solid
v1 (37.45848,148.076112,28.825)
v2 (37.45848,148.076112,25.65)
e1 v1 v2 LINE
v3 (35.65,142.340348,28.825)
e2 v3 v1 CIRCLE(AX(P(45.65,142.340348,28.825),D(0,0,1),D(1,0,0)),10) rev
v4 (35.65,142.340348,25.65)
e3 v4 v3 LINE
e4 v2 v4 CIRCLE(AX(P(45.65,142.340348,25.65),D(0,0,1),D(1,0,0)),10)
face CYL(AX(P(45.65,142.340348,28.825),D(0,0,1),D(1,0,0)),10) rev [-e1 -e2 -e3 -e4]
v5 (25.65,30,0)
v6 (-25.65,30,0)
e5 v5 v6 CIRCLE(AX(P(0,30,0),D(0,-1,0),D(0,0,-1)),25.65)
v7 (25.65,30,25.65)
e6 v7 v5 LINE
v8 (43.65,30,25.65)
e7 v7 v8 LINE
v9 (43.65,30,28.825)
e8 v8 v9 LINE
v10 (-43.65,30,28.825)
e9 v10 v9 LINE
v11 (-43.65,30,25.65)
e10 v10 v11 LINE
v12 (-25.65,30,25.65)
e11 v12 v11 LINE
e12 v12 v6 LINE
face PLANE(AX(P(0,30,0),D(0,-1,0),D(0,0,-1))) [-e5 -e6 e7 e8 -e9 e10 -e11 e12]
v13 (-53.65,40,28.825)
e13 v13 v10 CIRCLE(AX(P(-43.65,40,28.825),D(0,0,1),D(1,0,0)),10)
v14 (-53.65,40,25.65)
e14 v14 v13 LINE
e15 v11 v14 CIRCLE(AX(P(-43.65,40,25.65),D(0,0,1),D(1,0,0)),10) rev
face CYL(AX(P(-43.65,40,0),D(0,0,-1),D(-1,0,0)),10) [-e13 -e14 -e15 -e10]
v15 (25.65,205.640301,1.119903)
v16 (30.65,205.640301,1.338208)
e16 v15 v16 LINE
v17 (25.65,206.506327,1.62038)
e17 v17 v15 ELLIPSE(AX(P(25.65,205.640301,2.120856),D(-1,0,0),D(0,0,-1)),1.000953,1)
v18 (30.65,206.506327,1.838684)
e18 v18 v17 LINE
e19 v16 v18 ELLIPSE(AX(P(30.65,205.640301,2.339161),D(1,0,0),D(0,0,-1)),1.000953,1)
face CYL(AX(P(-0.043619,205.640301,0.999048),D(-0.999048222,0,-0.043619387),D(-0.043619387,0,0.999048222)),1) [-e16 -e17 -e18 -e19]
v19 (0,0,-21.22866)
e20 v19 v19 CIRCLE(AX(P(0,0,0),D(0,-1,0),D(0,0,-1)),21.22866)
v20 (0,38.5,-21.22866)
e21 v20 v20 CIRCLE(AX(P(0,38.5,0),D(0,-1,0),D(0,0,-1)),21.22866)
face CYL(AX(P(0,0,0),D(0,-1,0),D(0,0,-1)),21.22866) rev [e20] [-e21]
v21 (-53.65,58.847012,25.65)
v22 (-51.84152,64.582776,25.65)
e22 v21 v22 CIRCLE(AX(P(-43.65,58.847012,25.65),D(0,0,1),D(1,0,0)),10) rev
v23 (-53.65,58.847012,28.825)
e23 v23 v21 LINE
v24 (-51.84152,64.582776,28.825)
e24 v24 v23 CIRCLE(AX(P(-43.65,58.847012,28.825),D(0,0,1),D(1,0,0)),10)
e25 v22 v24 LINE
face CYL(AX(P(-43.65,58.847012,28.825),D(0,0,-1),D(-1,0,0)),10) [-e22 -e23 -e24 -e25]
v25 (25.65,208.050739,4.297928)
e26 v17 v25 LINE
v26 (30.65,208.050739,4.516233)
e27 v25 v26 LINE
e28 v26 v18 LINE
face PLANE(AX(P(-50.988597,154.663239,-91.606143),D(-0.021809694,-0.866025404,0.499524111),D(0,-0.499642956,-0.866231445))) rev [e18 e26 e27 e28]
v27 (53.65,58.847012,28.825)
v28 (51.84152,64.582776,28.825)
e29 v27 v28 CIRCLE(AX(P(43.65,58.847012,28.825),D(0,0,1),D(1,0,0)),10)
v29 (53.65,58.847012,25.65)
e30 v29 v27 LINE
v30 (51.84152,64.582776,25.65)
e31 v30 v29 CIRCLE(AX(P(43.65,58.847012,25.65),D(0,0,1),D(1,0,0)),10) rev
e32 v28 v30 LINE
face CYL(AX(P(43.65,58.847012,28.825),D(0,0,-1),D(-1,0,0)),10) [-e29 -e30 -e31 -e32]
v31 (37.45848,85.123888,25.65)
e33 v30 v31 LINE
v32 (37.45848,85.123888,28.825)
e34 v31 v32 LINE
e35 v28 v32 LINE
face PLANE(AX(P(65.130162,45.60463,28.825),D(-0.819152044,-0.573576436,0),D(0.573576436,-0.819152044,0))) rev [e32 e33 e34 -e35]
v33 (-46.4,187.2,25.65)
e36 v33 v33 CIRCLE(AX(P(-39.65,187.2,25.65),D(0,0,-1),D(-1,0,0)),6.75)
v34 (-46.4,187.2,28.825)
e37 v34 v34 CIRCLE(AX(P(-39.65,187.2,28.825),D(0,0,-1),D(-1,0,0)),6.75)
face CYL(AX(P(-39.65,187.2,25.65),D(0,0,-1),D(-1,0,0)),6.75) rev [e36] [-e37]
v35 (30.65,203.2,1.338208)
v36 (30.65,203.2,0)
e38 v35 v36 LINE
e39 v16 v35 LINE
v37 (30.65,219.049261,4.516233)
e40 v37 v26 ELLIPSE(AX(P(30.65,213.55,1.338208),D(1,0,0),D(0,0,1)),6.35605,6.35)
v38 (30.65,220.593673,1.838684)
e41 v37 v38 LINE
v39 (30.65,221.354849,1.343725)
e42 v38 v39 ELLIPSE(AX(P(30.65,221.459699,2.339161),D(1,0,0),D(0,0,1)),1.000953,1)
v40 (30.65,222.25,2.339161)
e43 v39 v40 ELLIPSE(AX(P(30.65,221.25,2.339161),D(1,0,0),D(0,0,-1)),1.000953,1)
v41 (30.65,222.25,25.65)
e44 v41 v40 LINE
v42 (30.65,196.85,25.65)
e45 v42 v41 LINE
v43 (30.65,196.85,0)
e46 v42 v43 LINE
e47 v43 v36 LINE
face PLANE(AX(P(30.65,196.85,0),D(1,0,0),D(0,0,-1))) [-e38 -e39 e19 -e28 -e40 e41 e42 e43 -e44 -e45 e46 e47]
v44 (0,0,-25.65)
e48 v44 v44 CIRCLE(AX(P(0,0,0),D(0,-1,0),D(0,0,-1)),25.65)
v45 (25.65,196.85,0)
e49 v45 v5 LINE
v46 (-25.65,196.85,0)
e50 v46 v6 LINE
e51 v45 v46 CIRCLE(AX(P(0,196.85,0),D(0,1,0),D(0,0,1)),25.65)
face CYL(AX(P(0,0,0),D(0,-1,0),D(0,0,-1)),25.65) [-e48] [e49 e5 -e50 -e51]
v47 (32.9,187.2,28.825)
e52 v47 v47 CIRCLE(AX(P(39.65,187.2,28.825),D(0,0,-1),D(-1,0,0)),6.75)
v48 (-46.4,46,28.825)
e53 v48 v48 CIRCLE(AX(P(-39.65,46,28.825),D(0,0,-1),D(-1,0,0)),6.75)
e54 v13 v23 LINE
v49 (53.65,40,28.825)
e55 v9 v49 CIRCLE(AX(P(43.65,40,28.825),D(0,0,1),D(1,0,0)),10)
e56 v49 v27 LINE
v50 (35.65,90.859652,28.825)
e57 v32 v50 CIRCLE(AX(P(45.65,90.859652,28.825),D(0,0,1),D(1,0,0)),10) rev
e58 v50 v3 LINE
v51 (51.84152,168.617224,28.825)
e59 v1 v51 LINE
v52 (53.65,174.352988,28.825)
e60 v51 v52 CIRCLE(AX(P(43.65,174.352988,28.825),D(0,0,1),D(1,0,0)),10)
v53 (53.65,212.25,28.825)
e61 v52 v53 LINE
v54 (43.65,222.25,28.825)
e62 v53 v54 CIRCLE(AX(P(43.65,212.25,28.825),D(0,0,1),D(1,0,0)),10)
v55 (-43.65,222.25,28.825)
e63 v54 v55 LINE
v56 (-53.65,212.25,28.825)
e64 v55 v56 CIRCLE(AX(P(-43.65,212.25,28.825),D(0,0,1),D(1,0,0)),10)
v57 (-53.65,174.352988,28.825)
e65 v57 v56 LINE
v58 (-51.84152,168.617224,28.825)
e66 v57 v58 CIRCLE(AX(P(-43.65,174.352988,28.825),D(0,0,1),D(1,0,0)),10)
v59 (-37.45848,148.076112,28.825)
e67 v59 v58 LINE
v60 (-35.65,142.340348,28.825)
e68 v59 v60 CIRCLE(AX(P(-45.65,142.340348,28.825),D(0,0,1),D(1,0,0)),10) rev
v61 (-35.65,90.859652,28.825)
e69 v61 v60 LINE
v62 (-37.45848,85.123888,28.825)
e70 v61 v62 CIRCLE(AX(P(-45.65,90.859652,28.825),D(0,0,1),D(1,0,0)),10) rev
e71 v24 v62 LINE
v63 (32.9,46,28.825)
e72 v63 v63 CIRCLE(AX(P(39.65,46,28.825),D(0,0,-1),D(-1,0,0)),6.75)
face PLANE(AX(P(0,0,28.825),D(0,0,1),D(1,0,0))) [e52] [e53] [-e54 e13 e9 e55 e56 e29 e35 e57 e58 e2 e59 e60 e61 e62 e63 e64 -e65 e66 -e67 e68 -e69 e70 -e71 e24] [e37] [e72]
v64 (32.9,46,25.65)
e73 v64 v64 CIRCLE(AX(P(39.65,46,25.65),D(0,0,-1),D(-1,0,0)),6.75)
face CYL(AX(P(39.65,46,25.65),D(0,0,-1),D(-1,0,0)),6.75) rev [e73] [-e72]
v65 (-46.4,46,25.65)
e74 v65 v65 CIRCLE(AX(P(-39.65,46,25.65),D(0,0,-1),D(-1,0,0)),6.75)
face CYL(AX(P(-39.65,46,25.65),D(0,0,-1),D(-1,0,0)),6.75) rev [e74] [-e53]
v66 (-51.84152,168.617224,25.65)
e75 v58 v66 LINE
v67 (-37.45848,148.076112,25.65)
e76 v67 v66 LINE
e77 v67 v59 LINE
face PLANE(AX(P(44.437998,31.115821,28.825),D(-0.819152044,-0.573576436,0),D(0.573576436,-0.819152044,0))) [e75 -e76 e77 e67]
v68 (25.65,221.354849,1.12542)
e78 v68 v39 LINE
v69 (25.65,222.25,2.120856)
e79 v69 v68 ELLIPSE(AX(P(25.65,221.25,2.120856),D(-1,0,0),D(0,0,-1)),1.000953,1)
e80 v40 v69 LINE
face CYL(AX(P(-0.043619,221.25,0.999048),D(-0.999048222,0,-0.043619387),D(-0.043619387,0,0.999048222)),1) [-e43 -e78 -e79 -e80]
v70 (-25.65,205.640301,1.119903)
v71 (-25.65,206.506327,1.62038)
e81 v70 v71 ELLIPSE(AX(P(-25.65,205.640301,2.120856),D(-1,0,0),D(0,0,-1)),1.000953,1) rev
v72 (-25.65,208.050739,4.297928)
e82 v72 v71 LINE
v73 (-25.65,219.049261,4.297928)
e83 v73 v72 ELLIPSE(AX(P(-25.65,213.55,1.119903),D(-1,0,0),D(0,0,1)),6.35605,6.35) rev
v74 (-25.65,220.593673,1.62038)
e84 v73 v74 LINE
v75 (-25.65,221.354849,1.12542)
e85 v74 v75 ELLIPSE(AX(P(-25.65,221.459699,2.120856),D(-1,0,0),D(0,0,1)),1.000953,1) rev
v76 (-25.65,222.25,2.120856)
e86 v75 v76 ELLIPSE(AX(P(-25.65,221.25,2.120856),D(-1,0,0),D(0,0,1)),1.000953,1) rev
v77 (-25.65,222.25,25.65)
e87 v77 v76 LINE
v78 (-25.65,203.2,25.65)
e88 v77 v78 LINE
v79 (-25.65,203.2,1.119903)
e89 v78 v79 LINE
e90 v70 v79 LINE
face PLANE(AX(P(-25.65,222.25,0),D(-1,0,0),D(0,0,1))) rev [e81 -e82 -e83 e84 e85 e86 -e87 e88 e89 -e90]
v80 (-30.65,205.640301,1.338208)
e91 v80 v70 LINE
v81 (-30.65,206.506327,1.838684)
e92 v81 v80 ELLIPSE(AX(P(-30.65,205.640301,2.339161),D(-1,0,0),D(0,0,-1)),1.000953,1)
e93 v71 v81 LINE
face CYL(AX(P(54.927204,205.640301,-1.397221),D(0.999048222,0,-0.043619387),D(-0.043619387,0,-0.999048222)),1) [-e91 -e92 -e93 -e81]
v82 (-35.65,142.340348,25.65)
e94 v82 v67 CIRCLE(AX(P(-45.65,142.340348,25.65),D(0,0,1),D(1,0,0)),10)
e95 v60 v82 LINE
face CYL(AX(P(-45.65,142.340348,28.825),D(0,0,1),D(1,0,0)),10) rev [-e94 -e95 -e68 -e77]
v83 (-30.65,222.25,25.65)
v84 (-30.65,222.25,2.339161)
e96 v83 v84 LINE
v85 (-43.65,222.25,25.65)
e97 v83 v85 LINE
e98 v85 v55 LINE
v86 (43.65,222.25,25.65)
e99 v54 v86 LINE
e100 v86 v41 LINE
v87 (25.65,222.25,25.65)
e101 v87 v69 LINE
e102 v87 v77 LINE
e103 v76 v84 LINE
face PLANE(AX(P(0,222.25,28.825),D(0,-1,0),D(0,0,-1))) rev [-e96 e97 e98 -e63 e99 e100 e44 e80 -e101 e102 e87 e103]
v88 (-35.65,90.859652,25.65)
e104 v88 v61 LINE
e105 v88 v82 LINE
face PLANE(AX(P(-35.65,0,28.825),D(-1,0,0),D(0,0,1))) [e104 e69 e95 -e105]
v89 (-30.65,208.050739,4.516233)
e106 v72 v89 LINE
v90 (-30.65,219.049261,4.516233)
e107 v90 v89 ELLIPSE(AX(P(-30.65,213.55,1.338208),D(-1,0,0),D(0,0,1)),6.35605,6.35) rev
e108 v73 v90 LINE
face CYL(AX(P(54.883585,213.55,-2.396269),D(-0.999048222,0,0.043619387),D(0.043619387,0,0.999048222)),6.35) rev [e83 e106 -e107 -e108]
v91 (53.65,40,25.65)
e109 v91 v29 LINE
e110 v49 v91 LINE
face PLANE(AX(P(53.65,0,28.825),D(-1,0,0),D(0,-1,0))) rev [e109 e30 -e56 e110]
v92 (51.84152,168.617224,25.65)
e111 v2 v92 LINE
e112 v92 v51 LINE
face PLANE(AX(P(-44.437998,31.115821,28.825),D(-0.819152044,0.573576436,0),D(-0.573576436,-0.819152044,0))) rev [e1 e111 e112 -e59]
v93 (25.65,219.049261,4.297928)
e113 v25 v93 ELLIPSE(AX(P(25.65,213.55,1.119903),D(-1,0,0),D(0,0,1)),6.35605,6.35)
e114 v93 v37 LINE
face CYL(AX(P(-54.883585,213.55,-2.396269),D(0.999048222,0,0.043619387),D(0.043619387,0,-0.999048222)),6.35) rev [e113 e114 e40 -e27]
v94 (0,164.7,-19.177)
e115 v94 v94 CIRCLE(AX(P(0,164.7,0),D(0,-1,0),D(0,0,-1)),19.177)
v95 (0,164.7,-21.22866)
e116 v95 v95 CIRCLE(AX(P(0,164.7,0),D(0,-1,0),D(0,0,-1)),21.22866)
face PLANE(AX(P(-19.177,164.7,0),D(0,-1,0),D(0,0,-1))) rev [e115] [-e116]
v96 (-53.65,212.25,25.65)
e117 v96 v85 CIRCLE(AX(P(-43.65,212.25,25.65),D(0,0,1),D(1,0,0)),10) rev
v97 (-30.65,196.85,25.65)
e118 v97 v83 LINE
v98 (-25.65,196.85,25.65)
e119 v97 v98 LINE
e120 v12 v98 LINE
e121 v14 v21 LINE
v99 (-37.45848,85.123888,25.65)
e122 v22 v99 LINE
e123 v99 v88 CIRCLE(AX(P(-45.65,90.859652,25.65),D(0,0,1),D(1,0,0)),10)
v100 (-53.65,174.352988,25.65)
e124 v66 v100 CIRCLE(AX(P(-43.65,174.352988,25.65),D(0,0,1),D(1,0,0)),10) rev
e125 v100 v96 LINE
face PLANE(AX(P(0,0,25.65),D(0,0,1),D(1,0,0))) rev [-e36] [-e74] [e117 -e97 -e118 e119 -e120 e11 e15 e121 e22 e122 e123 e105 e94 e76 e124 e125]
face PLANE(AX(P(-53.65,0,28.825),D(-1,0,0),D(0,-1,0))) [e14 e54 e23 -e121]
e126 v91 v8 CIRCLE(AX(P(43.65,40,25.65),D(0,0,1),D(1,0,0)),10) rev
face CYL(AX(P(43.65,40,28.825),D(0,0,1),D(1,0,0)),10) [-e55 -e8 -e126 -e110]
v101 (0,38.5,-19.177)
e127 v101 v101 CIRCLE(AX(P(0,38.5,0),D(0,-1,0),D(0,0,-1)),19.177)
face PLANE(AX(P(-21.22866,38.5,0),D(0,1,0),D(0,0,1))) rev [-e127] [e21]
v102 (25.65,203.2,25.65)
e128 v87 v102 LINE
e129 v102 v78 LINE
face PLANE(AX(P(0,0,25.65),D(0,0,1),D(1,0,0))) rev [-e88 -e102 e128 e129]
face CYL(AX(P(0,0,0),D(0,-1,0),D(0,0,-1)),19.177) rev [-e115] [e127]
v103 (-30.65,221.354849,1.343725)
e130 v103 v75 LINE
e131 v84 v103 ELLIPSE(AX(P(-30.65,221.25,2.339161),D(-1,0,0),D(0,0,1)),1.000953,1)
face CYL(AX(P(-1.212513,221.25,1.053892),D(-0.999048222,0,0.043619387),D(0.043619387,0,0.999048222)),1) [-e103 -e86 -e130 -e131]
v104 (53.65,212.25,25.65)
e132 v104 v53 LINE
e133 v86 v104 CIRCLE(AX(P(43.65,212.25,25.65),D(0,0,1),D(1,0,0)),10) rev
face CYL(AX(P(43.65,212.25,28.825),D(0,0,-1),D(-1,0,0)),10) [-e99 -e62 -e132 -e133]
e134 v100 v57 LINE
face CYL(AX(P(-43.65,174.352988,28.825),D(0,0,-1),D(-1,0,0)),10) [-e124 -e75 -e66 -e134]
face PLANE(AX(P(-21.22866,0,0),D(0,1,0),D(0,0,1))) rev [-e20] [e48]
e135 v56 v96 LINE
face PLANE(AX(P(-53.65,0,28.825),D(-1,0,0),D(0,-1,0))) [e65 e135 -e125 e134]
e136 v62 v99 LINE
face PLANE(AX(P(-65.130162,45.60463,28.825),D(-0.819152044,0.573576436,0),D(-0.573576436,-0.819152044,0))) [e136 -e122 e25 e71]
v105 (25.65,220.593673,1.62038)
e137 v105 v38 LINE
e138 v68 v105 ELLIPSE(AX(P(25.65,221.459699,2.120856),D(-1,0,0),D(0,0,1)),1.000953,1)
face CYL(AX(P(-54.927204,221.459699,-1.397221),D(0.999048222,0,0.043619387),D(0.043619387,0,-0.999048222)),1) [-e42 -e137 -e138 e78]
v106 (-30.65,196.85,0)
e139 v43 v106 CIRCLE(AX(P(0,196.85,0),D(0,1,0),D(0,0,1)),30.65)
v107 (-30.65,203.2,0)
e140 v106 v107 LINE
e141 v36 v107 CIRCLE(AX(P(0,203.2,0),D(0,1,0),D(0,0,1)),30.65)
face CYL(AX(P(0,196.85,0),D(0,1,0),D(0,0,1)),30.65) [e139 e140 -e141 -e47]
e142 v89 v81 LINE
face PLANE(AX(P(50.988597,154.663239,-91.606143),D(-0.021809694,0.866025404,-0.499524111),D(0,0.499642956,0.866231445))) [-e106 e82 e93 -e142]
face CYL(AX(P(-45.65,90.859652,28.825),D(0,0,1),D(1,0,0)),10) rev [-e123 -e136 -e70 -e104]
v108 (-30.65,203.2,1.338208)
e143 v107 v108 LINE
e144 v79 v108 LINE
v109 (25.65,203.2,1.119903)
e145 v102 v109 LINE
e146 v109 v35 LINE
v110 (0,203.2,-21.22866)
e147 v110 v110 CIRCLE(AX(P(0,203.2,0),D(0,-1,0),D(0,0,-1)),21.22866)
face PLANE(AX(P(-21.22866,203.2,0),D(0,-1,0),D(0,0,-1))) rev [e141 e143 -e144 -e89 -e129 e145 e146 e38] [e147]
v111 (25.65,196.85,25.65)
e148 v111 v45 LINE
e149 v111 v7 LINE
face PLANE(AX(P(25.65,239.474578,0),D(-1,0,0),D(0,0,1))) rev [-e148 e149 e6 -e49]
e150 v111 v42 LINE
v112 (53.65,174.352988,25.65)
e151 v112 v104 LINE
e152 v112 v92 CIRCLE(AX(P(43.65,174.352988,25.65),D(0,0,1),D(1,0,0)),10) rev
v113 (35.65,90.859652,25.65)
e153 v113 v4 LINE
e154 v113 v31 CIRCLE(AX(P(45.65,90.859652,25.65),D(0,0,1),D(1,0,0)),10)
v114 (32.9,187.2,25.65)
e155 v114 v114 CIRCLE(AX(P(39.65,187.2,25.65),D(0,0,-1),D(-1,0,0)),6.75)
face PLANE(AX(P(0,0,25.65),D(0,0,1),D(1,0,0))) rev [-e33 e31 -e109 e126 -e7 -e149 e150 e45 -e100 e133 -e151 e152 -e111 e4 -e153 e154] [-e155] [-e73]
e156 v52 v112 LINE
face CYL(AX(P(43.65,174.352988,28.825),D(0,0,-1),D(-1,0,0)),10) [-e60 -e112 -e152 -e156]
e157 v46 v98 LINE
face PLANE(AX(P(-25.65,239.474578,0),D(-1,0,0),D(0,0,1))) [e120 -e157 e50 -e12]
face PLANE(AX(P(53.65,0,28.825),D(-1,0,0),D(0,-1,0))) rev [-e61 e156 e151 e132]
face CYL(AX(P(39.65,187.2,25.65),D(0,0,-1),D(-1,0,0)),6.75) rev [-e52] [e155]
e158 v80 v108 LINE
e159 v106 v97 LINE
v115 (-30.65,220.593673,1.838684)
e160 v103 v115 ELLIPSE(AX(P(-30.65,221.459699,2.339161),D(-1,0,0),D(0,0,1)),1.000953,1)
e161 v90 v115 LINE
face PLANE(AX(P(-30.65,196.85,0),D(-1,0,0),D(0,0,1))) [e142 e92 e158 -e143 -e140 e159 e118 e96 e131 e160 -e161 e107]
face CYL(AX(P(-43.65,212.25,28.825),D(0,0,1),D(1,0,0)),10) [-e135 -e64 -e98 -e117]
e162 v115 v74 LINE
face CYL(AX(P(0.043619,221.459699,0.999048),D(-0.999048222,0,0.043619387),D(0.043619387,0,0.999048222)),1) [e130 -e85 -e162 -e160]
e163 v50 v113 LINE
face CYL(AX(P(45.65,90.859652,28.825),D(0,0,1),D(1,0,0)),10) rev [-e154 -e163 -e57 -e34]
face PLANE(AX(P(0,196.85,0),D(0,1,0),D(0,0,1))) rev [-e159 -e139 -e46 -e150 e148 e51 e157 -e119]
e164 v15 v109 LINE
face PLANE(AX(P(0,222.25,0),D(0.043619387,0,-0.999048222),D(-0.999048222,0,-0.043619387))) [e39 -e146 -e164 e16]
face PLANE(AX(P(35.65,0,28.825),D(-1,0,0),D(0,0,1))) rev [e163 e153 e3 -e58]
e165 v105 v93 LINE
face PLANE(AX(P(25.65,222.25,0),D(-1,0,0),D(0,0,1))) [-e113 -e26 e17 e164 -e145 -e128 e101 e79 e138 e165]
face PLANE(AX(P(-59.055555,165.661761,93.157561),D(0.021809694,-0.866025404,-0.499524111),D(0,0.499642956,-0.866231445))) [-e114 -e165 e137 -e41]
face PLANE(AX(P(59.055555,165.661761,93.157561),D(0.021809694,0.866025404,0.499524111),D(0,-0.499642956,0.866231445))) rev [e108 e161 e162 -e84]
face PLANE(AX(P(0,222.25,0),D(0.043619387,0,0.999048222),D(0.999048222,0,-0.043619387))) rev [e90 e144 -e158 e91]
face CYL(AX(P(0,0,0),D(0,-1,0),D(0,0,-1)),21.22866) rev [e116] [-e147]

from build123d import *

# Parameters (mm, degrees)
BOSS_EXTRUDE1_START   = -173.2
BOSS_EXTRUDE1_DEPTH   = 173.2
BOSS_EXTRUDE2_DEPTH   = 3.175
M12_CLEARANCE_HOLE1_D = 13.5
FILLET1_R             = 10
FILLET1_OF_MIRROR1_R  = 10
BOSS_EXTRUDE3_DEPTH   = 6.35
BOSS_EXTRUDE4_DEPTH   = 19.05
CUT_EXTRUDE1_DEPTH    = 238.82533849
FILLET2_R             = 1
FILLET2_OF_MIRROR2_R  = 1


with BuildPart() as part:
    # Sketch12 → Revolve1 (revolve)
    with BuildSketch(Plane.XY, mode=Mode.PRIVATE) as revolve1_sk:
        Polygon((-25.65, 0), (-25.65, 203.2), (-21.22866, 203.2), (-21.22866, 164.7), (-19.177, 164.7), (-19.177, 38.5), (-21.22866, 38.5), (-21.22866, 0), align=None)
    revolve(revolve1_sk.sketch.rotate(Axis((0, 0, 0), (0, 1, 0)), 270), axis=Axis((0, 0, 0), (0, 1, 0)))

    # Sketch14 → Boss-Extrude1 (add)
    with BuildSketch(Plane(origin=(0, 30, 0), x_dir=(-1, 0, 0), z_dir=(0, -1, 0)).offset(BOSS_EXTRUDE1_START)):
        with BuildLine():
            Line((-25.65, 0), (-25.65, -25.65))
            Line((-25.65, -25.65), (1.5e-08, -25.65))
            ThreePointArc((1.5e-08, -25.65), (-18.137288932, -18.137288943), (-25.65, 0))
        make_face()
        with BuildLine():
            ThreePointArc((25.65, 0), (18.137288943, -18.137288932), (1.5e-08, -25.65))
            Line((1.5e-08, -25.65), (25.65, -25.65))
            Line((25.65, -25.65), (25.65, 0))
        make_face()
    extrude(amount=BOSS_EXTRUDE1_DEPTH)

    # Sketch27 → Boss-Extrude2 (add)
    with BuildSketch(Plane.XY.offset(25.65)):
        Polygon((-25.65, 30), (53.65, 30), (53.65, 62), (35.65, 87.706664121), (35.65, 145.493335879), (53.65, 171.2), (53.65, 222.25), (-25.65, 222.25), align=None)
    boss_extrude2 = extrude(amount=BOSS_EXTRUDE2_DEPTH)

    # M12 Clearance Hole1 (through all)
    with Locations(Plane(origin=(0, 0, 25.65), x_dir=(-1, 0, 0), z_dir=(0, 0, -1))):
        with Locations((-39.65, 46), (-39.65, 187.2)):
            m12_clearance_hole1 = Hole(M12_CLEARANCE_HOLE1_D / 2)

    # Fillet1
    fillet1_edges = [part.edges().sort_by_distance(p)[0] for p in [
        (53.65, 222.25, 27.2375),
        (53.65, 30, 27.2375),
        (53.65, 62, 27.2375),
        (35.65, 87.706664121, 27.2375),
        (35.65, 145.493335879, 27.2375),
        (53.65, 171.2, 27.2375),
    ]]
    fillet(fillet1_edges, radius=FILLET1_R)

    # Mirror1: Boss-Extrude2, M12 Clearance Hole1 across plane
    add(boss_extrude2.mirror(Plane(origin=(0, 0, 0), x_dir=(0, 0, 1), z_dir=(1, 0, 0))))
    add(m12_clearance_hole1.mirror(Plane(origin=(0, 0, 0), x_dir=(0, 0, 1), z_dir=(1, 0, 0))), mode=Mode.SUBTRACT)

    # Fillet1 of Mirror1
    fillet1_of_mirror1_edges = [part.edges().sort_by_distance(p)[0] for p in [
        (-53.65, 222.25, 27.2375),
        (-53.65, 30, 27.2375),
        (-53.65, 62, 27.2375),
        (-35.65, 87.706664121, 27.2375),
        (-35.65, 145.493335879, 27.2375),
        (-53.65, 171.2, 27.2375),
    ]]
    fillet(fillet1_of_mirror1_edges, radius=FILLET1_OF_MIRROR1_R)

    # Sketch33 → Boss-Extrude3 (add)
    with BuildSketch(Plane(origin=(0, 203.2, 0), x_dir=(1, 0, 0), z_dir=(0, 1, 0))):
        with BuildLine():
            Line((30.65, -25.65), (30.65, 0))
            ThreePointArc((30.65, 0), (0, 30.65), (-30.65, 0))
            Line((-30.65, 0), (-30.65, -25.65))
            Line((-30.65, -25.65), (-25.65, -25.65))
            Line((-25.65, -25.65), (-25.65, 0))
            ThreePointArc((-25.65, 0), (0, 25.65), (25.65, 0))
            Line((25.65, 0), (25.65, -25.65))
            Line((25.65, -25.65), (30.65, -25.65))
        make_face()
        Polygon((25.65, -25.65), (30.65, -25.65), (30.65, -1.3382079), (25.65, -1.119903186), align=None)
    extrude(amount=-BOSS_EXTRUDE3_DEPTH)

    # Sketch33<3> → Boss-Extrude4 (add)
    with BuildSketch(Plane(origin=(0, 203.2, 0), x_dir=(1, 0, 0), z_dir=(0, 1, 0))):
        Polygon((25.65, -25.65), (30.65, -25.65), (30.65, -1.3382079), (25.65, -1.119903186), align=None)
    boss_extrude4 = extrude(amount=BOSS_EXTRUDE4_DEPTH)

    # Sketch34 → Cut-Extrude1 (cut, symmetric)
    with BuildSketch(Plane(origin=(24.827906129, 0, 1.084009792), x_dir=(0.043619387365336035, 0, -0.9990482215818578), z_dir=(0.9990482215818577, 0, 0.04361938736533603))):
        with BuildLine():
            ThreePointArc((0, 219.9), (-1.643500936, 219.683628997), (-3.175, 219.049261314))
            Line((-3.175, 219.049261314), (0, 213.55))
            Line((0, 213.55), (0, 219.9))
        make_face()
        with BuildLine():
            Line((0, 213.55), (-3.175, 219.049261314))
            ThreePointArc((-3.175, 219.049261314), (-6.35, 213.55), (-3.175, 208.050738686))
            Line((-3.175, 208.050738686), (0, 213.55))
        make_face()
        with BuildLine():
            Line((0, 220.882348419), (-3.175, 219.049261314))
            ThreePointArc((-3.175, 219.049261314), (-1.643500936, 219.683628997), (0, 219.9))
            Line((0, 219.9), (0, 220.882348419))
        make_face()
        with BuildLine():
            Line((0, 207.2), (0, 213.55))
            Line((0, 213.55), (-3.175, 208.050738686))
            ThreePointArc((-3.175, 208.050738686), (-1.643500936, 207.416371003), (0, 207.2))
        make_face()
        with BuildLine():
            ThreePointArc((0, 207.2), (-1.643500936, 207.416371003), (-3.175, 208.050738686))
            Line((-3.175, 208.050738686), (0, 206.217651581))
            Line((0, 206.217651581), (0, 207.2))
        make_face()
    cut_extrude1 = extrude(amount=CUT_EXTRUDE1_DEPTH, both=True, mode=Mode.SUBTRACT)

    # Fillet2
    # the kernel refuses this fillet: 1 mm, written as the material it takes off along each edge
    with BuildSketch(Plane(origin=(33.147620554, 222.25, 1.447256369), x_dir=(-0.04361938736533601, 0, 0.9990482215818578), z_dir=(-0.9990482215818578, 0, -0.043619387365336))) as fillet2_piece_1:
        with BuildLine():
            CenterArc((FILLET2_R, -FILLET2_R), FILLET2_R, 90, 90)
            Line((0, -FILLET2_R), (0, 0))
            Line((0, 0), (FILLET2_R, 0))
        make_face()
    extrude(amount=10.004763426, mode=Mode.SUBTRACT)
    with BuildSketch(Plane(origin=(24.207998101, 220.882348419, 1.056944023), x_dir=(0, 1, 0), z_dir=(0.9990482215818578, 0, 0.043619387365336035))) as fillet2_piece_2:
        with BuildLine():
            CenterArc((FILLET2_R * 0.57735026919, FILLET2_R), FILLET2_R, 210, 60)
            Line((-FILLET2_R * 0.288675134595, FILLET2_R * 0.5), (0, 0))
            Line((0, 0), (FILLET2_R * 0.57735026919, 0))
        make_face()
    extrude(amount=7.891514772, mode=Mode.SUBTRACT)
    with BuildSketch(Plane(origin=(32.092001899, 206.217651581, 1.401167063), x_dir=(-0.03777549755589492, 0.5000000000000023, 0.8652011394955523), z_dir=(-0.9990482215818578, 0, -0.043619387365336035))) as fillet2_piece_3:
        with BuildLine():
            CenterArc((FILLET2_R * 0.57735026919, -FILLET2_R), FILLET2_R, 90, 60)
            Line((-FILLET2_R * 0.288675134595, -FILLET2_R * 0.5), (0, 0))
            Line((0, 0), (FILLET2_R * 0.57735026919, 0))
        make_face()
    extrude(amount=7.891514772, mode=Mode.SUBTRACT)

    # Mirror2: Boss-Extrude4, Cut-Extrude1 across plane
    add(boss_extrude4.mirror(Plane(origin=(0, 0, 0), x_dir=(0, 0, 1), z_dir=(1, 0, 0))))
    add(cut_extrude1.mirror(Plane(origin=(0, 0, 0), x_dir=(0, 0, 1), z_dir=(1, 0, 0))), mode=Mode.SUBTRACT)

    # Fillet2 of Mirror2
    # the kernel refuses this fillet: 1 mm, written as the material it takes off along each edge
    with BuildSketch(Plane(origin=(-33.147620554, 222.25, 1.447256369), x_dir=(0.04361938736533601, 0, 0.9990482215818578), z_dir=(0.9990482215818578, 0, -0.043619387365336))) as fillet2_of_mirror2_piece_1:
        with BuildLine():
            CenterArc((FILLET2_OF_MIRROR2_R, FILLET2_OF_MIRROR2_R), FILLET2_OF_MIRROR2_R, 180, 90)
            Line((0, FILLET2_OF_MIRROR2_R), (0, 0))
            Line((0, 0), (FILLET2_OF_MIRROR2_R, 0))
        make_face()
    extrude(amount=10.004763426, mode=Mode.SUBTRACT)
    with BuildSketch(Plane(origin=(-24.207998101, 220.882348419, 1.056944023), x_dir=(0, 1, 0), z_dir=(-0.9990482215818578, 0, 0.043619387365336035)), Plane(origin=(-32.092001899, 206.217651581, 1.401167063), x_dir=(0, -1, 0), z_dir=(0.9990482215818578, 0, -0.043619387365336035))) as fillet2_of_mirror2_piece_2:
        with BuildLine():
            CenterArc((FILLET2_OF_MIRROR2_R * 0.57735026919, -FILLET2_OF_MIRROR2_R), FILLET2_OF_MIRROR2_R, 90, 60)
            Line((-FILLET2_OF_MIRROR2_R * 0.288675134595, -FILLET2_OF_MIRROR2_R * 0.5), (0, 0))
            Line((0, 0), (FILLET2_OF_MIRROR2_R * 0.57735026919, 0))
        make_face()
    extrude(amount=7.891514772, mode=Mode.SUBTRACT)


solid = part.part
